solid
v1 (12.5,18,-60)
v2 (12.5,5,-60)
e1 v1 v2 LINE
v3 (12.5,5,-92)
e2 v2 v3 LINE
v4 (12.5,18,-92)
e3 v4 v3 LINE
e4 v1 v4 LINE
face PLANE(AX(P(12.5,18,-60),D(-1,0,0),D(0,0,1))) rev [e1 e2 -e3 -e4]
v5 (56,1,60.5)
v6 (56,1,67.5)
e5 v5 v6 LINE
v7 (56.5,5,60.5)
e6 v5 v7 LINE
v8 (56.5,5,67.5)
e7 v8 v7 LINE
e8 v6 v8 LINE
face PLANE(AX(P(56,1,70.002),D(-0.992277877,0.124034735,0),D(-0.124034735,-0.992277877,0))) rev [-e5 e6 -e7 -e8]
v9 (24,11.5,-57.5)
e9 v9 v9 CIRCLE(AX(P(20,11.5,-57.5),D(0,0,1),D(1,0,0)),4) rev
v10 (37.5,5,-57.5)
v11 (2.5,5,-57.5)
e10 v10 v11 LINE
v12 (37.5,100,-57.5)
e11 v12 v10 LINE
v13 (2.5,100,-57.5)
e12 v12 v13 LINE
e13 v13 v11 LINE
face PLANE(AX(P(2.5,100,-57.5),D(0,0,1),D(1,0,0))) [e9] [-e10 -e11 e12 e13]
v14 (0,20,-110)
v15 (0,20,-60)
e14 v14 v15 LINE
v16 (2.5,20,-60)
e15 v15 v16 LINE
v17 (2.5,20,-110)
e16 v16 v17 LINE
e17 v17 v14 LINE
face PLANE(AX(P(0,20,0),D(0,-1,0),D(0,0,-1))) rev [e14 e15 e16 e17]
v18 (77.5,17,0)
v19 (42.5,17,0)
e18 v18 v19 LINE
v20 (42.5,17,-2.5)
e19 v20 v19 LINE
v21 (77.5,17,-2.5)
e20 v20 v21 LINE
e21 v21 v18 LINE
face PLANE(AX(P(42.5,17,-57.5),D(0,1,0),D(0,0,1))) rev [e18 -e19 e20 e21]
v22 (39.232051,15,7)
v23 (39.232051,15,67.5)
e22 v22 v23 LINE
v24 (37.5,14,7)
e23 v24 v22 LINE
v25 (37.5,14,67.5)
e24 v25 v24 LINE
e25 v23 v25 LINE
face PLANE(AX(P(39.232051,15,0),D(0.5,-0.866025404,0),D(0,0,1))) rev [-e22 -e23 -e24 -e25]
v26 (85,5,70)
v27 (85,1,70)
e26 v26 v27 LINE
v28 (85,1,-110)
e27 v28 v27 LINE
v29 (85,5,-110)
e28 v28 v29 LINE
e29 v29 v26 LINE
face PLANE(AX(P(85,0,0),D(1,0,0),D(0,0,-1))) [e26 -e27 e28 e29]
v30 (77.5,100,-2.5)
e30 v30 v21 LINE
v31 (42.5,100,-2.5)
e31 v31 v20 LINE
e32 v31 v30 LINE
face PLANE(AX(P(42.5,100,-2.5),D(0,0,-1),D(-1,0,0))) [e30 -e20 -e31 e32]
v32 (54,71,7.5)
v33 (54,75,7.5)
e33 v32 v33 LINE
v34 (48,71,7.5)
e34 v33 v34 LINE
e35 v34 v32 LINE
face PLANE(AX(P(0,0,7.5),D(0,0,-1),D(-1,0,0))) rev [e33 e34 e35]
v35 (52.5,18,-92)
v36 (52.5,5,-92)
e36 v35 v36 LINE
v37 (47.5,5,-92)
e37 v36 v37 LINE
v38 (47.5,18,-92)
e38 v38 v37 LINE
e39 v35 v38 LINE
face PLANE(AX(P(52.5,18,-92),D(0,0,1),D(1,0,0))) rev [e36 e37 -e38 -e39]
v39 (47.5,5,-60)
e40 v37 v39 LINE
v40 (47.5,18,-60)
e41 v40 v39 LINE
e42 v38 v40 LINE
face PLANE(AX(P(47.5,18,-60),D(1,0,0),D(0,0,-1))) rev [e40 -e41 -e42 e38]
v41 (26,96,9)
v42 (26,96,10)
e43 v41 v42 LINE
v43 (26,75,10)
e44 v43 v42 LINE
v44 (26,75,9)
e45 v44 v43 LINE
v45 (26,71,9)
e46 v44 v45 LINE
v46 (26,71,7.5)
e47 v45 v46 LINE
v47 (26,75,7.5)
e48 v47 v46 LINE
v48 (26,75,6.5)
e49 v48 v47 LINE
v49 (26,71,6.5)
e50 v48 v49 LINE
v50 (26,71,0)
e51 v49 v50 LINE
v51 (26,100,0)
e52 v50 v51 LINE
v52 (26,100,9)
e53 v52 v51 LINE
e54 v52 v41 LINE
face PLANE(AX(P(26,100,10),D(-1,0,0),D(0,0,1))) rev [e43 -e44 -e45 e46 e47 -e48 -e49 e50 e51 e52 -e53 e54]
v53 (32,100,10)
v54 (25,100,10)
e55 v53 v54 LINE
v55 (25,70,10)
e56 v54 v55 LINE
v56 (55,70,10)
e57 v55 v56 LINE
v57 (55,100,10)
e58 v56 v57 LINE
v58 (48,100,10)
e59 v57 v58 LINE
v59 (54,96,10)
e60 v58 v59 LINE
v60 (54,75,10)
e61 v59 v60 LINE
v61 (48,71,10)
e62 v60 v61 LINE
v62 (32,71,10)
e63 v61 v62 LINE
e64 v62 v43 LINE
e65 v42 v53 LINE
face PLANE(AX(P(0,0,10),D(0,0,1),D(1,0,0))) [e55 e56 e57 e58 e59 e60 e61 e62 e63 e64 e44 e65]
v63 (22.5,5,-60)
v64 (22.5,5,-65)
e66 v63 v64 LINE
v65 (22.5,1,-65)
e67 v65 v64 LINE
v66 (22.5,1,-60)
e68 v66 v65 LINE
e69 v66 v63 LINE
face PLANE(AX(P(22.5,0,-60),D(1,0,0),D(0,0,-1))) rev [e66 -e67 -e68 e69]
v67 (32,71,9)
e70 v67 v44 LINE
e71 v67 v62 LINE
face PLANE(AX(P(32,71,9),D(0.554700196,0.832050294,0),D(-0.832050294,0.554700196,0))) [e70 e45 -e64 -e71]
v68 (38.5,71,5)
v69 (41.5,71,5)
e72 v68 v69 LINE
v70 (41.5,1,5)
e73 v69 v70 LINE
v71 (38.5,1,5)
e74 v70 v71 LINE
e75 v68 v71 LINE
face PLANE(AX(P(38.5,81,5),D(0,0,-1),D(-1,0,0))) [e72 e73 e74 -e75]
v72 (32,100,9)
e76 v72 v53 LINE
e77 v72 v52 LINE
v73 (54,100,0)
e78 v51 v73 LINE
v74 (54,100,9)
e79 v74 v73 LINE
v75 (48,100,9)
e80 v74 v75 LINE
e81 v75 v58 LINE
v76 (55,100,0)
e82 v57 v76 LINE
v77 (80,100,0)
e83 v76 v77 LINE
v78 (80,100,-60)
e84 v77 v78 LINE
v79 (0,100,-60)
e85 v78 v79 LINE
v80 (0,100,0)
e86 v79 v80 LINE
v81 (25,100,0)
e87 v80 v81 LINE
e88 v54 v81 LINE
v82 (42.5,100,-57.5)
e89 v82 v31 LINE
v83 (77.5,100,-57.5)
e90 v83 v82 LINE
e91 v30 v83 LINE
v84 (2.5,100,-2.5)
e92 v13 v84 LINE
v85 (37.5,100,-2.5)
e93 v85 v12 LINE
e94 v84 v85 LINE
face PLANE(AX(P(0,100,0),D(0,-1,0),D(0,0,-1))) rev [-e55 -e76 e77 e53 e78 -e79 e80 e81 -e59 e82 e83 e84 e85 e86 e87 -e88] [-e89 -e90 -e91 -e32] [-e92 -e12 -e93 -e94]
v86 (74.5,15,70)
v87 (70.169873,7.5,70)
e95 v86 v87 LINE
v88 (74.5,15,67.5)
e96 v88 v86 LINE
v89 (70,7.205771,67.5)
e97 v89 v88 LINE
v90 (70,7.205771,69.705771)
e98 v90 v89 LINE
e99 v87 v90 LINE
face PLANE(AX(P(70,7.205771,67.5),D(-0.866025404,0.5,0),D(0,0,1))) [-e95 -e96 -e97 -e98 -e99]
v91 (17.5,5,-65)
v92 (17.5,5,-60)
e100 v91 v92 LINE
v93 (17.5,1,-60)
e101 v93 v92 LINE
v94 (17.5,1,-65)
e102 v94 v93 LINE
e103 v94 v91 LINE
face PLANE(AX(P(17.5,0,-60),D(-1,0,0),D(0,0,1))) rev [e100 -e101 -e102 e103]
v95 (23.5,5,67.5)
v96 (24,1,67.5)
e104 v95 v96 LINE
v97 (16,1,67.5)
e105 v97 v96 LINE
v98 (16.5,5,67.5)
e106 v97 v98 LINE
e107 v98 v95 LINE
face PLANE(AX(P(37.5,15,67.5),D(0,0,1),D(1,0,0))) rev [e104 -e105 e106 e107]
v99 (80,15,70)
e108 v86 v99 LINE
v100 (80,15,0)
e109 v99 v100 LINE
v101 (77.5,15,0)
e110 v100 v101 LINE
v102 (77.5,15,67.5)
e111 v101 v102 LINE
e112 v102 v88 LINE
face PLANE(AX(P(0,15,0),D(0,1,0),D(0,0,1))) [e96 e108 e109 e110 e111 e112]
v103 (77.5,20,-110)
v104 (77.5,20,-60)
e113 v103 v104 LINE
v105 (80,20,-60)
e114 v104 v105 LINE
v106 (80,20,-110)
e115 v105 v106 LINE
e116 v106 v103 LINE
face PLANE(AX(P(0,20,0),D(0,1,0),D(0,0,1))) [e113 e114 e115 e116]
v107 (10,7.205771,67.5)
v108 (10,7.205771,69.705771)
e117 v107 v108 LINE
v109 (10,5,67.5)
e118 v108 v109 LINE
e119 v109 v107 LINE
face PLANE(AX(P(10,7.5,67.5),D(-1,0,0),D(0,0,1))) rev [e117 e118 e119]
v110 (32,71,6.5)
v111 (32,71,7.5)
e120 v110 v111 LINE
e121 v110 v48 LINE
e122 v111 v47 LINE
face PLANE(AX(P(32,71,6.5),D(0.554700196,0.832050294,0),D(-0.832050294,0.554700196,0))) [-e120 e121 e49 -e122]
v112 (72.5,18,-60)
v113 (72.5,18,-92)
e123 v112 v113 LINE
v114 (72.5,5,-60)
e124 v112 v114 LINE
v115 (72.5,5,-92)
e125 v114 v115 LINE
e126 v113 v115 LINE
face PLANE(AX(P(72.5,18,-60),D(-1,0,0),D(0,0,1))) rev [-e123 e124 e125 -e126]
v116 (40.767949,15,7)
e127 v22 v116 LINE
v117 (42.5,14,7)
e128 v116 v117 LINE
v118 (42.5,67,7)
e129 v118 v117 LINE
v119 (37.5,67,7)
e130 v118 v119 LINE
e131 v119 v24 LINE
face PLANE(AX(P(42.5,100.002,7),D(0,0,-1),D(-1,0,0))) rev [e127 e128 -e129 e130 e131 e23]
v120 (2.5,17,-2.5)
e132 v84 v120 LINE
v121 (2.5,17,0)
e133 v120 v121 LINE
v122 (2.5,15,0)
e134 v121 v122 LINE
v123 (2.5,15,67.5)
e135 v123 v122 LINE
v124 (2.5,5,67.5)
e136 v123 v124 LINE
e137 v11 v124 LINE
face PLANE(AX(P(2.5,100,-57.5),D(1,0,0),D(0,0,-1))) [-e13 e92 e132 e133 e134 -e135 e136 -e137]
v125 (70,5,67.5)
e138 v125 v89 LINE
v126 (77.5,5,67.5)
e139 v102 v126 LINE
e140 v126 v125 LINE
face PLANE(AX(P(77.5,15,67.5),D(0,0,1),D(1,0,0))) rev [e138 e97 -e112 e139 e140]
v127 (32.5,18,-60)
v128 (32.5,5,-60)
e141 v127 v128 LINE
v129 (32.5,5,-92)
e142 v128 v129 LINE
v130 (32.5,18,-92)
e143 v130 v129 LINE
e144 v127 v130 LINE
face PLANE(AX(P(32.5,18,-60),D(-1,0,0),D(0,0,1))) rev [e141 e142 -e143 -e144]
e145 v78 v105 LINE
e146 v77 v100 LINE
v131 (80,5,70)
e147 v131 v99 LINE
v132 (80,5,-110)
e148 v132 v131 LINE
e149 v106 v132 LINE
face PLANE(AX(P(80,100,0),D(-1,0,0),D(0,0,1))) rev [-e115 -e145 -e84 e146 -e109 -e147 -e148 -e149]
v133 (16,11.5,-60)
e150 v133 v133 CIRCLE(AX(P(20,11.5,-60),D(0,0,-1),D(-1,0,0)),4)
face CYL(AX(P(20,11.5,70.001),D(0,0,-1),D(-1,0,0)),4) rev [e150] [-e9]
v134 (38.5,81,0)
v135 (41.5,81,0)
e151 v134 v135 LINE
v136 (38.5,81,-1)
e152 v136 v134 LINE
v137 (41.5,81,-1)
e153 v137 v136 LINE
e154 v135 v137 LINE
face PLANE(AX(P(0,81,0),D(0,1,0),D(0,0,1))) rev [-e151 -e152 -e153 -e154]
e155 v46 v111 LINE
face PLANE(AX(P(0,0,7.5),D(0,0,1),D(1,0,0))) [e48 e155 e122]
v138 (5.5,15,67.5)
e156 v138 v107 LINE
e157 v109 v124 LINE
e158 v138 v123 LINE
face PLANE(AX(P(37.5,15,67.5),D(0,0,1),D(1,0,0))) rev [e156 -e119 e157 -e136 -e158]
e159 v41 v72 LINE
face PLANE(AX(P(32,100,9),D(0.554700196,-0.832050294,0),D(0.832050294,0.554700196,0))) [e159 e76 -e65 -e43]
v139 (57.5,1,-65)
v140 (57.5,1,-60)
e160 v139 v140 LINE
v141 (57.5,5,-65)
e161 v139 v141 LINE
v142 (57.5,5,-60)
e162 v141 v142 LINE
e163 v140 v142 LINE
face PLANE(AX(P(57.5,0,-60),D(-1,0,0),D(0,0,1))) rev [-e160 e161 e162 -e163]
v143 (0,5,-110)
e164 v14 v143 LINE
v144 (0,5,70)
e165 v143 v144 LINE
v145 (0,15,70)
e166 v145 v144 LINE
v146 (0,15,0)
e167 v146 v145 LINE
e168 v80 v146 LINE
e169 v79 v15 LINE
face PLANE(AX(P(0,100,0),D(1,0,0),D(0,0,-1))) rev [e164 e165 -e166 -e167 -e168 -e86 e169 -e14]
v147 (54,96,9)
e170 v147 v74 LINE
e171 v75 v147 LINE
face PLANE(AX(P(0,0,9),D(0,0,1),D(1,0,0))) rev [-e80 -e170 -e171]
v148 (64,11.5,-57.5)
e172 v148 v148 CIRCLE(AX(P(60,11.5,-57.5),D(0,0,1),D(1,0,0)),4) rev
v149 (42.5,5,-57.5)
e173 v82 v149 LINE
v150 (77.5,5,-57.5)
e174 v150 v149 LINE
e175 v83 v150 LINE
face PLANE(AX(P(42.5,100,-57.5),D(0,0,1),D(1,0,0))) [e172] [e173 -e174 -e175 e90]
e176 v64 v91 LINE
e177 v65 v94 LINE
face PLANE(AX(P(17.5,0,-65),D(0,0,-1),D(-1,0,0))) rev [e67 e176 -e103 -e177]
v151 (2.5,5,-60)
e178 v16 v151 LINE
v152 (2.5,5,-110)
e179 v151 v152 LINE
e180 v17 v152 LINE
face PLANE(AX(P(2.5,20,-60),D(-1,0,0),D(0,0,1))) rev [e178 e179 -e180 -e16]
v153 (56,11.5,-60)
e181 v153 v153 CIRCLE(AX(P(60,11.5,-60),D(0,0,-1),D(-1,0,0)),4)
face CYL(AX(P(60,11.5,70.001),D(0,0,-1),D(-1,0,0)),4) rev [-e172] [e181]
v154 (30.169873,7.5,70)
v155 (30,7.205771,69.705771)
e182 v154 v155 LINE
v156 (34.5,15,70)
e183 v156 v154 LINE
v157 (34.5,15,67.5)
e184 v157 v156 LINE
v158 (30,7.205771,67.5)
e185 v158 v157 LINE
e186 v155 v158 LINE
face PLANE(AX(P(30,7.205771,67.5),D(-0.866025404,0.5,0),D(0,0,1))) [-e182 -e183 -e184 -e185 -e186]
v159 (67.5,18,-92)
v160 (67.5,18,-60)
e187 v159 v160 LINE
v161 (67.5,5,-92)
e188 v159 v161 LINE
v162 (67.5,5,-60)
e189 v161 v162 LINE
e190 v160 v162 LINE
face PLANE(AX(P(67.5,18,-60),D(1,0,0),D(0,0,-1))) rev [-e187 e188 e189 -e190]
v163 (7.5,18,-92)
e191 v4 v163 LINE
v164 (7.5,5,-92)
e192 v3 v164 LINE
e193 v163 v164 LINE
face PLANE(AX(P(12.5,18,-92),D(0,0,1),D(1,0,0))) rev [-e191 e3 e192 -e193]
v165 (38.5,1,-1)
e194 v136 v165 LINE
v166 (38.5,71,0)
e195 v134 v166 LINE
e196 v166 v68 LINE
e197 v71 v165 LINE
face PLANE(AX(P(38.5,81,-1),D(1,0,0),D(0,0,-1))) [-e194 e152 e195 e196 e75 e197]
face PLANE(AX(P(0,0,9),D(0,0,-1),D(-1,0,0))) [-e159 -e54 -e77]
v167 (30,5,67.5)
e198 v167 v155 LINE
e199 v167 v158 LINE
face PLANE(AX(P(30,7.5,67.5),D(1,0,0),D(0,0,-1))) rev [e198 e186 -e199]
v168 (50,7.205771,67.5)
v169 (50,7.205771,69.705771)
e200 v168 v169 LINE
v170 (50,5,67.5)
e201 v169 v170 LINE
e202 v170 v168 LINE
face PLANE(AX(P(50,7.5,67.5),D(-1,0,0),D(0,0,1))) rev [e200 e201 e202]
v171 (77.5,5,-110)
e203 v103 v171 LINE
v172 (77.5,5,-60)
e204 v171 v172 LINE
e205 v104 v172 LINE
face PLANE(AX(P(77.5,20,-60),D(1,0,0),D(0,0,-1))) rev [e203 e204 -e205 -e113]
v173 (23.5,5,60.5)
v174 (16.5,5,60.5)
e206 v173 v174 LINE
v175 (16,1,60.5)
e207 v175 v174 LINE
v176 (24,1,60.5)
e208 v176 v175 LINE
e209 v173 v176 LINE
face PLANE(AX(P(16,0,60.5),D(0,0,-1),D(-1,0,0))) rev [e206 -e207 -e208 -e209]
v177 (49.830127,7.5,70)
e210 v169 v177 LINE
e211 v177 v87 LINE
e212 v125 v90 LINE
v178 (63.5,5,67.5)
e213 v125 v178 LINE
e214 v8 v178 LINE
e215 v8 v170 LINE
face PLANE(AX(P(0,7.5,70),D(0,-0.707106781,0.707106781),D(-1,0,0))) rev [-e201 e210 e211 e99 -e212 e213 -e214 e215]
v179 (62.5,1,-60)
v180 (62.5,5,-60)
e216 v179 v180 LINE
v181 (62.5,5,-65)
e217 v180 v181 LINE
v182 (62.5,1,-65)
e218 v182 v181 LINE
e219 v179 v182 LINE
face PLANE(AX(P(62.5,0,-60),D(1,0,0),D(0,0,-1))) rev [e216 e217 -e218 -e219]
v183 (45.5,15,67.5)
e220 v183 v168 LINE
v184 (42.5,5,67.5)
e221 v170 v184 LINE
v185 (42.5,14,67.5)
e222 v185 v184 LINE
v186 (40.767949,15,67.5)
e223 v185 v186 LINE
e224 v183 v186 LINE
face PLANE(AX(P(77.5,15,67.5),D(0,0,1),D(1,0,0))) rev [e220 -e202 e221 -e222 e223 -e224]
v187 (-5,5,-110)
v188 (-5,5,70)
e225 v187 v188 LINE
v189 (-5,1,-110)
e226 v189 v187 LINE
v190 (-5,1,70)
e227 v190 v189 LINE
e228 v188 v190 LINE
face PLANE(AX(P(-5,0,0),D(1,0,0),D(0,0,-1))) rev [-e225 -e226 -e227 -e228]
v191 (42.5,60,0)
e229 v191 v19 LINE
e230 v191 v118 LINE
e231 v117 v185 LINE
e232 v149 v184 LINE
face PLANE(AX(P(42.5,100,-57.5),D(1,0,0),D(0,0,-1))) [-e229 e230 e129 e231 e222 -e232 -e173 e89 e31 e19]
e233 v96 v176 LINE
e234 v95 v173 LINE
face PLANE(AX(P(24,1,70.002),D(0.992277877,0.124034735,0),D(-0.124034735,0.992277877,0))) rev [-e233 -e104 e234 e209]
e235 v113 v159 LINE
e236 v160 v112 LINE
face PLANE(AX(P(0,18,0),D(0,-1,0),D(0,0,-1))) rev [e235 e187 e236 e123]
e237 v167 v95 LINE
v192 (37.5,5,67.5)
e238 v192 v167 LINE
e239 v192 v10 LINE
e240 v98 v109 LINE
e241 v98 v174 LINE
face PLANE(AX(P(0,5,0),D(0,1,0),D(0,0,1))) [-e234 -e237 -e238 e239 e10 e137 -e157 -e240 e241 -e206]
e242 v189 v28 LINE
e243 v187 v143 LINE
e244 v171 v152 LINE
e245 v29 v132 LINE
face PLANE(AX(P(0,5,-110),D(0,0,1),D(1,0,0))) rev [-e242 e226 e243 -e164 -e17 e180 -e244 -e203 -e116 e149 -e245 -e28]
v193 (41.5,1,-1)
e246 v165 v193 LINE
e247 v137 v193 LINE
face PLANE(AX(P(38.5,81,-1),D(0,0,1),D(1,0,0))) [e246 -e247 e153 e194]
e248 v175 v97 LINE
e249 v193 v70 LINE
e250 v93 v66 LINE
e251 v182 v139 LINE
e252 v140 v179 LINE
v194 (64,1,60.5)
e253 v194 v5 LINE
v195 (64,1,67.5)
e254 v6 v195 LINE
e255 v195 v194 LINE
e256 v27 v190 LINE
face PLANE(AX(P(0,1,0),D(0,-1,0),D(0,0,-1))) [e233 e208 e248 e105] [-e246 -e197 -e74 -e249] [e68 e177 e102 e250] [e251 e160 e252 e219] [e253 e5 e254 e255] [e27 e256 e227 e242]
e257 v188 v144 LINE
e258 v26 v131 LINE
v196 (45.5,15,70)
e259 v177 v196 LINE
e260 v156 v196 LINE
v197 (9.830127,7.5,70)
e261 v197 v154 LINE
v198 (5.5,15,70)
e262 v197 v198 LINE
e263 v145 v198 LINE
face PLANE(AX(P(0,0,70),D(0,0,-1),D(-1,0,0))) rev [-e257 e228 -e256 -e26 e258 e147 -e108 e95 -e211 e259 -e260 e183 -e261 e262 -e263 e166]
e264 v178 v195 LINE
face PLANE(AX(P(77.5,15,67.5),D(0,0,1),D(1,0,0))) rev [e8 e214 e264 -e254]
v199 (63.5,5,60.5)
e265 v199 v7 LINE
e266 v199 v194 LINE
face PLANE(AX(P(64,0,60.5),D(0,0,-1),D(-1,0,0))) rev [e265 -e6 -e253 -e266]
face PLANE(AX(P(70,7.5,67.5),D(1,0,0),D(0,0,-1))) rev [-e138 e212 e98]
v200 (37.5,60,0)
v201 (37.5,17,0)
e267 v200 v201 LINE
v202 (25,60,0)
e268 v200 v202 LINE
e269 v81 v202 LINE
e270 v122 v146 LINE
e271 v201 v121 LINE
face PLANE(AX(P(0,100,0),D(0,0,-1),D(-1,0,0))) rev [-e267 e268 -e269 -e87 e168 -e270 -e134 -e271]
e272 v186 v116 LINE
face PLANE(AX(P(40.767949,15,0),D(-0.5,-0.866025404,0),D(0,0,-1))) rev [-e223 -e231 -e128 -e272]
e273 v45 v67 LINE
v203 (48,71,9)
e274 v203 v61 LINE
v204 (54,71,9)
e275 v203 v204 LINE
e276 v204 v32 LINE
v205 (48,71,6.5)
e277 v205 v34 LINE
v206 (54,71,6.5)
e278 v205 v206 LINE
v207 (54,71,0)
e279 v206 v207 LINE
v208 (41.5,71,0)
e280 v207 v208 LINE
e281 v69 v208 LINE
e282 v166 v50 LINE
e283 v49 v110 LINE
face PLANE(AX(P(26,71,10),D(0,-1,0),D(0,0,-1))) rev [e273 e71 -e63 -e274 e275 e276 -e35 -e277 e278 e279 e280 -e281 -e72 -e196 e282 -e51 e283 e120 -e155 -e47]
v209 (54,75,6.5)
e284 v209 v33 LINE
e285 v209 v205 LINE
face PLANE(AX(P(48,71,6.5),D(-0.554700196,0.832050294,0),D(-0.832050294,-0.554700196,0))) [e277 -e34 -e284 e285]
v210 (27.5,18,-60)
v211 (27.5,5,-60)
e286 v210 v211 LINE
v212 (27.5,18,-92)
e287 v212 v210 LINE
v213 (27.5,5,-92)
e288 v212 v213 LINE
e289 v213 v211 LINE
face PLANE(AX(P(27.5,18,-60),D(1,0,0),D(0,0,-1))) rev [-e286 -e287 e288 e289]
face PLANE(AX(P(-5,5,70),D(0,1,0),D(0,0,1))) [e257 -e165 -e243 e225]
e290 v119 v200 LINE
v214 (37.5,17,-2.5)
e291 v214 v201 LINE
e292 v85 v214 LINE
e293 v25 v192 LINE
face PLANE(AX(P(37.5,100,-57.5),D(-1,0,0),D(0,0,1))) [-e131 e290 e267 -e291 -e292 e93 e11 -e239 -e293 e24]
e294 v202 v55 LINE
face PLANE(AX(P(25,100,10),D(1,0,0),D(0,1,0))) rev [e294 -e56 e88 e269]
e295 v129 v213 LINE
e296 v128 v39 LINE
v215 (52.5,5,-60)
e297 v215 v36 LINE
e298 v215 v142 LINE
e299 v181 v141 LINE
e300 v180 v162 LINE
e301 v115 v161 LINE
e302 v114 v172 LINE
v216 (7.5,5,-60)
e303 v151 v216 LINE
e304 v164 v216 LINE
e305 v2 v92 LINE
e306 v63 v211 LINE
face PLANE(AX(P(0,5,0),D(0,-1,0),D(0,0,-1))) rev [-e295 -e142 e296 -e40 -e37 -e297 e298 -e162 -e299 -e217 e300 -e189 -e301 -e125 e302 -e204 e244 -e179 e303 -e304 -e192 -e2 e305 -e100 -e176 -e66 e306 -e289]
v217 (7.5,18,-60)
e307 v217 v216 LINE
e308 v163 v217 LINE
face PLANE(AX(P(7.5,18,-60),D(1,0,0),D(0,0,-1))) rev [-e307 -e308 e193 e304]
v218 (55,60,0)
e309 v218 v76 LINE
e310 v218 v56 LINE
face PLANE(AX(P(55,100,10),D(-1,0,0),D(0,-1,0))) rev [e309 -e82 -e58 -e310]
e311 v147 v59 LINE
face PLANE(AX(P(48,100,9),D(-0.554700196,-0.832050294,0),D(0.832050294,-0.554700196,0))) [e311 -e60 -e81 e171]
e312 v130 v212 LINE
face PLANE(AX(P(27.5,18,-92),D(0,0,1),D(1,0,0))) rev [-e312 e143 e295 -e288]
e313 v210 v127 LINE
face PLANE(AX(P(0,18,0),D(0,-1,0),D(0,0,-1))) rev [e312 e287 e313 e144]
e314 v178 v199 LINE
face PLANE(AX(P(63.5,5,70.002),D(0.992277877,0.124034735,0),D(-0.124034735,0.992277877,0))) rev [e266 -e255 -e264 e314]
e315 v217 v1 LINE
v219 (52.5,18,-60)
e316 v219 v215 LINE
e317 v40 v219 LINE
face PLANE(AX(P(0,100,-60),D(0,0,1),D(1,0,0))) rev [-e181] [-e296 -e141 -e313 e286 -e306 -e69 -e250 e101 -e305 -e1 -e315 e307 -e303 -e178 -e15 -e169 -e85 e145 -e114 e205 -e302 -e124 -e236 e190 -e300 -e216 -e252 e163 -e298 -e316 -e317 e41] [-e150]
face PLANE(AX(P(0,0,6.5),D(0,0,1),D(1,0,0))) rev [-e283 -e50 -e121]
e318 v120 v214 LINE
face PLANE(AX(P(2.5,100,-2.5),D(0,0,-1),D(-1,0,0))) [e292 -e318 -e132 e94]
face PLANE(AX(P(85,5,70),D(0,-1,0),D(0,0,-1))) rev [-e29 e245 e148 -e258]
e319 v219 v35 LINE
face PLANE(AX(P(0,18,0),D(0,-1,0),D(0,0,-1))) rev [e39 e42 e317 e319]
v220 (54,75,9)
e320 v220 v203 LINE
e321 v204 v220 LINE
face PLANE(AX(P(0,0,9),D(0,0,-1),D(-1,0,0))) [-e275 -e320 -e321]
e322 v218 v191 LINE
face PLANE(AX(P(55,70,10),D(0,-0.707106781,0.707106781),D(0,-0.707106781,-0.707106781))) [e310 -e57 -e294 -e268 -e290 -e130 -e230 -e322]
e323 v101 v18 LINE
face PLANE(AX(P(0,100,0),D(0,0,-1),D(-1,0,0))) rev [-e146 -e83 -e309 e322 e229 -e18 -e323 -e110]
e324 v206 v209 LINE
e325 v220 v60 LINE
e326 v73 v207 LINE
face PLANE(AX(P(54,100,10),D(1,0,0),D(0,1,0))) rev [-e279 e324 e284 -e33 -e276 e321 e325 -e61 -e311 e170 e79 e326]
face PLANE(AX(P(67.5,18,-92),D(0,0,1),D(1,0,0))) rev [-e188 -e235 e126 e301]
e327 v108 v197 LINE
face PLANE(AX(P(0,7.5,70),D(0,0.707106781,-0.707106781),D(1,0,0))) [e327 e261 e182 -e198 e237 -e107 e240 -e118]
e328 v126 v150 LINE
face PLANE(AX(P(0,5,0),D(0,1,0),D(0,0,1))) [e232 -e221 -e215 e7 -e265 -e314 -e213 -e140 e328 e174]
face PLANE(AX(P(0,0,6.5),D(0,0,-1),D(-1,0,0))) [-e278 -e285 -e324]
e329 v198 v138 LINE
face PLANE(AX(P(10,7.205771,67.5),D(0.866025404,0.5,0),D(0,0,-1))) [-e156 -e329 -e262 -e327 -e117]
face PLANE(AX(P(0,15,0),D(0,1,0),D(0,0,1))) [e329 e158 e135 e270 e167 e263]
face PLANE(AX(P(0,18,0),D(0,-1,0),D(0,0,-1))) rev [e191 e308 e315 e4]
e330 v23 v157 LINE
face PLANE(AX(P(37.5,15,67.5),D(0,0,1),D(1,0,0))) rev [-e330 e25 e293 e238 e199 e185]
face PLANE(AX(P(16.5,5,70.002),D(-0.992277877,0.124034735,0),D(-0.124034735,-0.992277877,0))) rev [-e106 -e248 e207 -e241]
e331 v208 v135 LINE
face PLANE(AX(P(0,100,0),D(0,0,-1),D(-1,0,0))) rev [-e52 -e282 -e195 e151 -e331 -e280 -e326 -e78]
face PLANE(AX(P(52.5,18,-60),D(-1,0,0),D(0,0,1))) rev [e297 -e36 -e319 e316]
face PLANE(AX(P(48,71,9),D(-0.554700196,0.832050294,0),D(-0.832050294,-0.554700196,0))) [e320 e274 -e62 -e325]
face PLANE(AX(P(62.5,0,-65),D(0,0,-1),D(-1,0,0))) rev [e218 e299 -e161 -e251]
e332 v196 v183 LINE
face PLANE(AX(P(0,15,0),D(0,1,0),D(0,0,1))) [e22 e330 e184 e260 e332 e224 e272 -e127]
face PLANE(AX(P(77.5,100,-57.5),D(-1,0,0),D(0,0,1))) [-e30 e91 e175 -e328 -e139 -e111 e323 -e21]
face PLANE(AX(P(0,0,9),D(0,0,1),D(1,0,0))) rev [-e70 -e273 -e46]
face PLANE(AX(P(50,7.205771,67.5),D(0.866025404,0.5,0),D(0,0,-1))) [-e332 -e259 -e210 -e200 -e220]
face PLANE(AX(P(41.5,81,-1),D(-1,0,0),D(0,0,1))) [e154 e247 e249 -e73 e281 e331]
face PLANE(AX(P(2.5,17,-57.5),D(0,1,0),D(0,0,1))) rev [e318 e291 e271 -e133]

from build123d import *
from OCP.BRepFilletAPI import BRepFilletAPI_MakeChamfer

# Parameters (mm, degrees)
SKETCH1_W                                   = 80
SKETCH1_H                                   = 60
BOSS_EXTRUDE1_DEPTH                         = 100
CUT_EXTRUDE1_START                          = 5
SKETCH2_W                                   = 35
SKETCH2_H                                   = 55
CUT_EXTRUDE1_DEPTH                          = 95
SKETCH3_W                                   = 80
SKETCH3_H                                   = 5
BOSS_EXTRUDE2_DEPTH                         = 70
BOSS_EXTRUDE3_DEPTH                         = 10
SKETCH5_W                                   = 20
SKETCH5_H                                   = 2.5
CUT_EXTRUDE2_DEPTH                          = 7.5
SKETCH6_W                                   = 35
SKETCH6_H                                   = 12
CUT_EXTRUDE4_DEPTH                          = 57.5
CUT_EXTRUDE6_REACH                          = 184.483
SKETCH7_R                                   = 4
SKETCH9_W                                   = 80
SKETCH9_H                                   = 50
BOSS_EXTRUDE4_DEPTH                         = 5
SKETCH13_W                                  = 8
SKETCH13_H                                  = 7
CUT_EXTRUDE8_BUTTON_HOLES_DEPTH             = 166.90660023
BOSS_EXTRUDE5_OLED_MOUNT_DEPTH              = 10
BOSS_EXTRUDE6_OLED_MOUNT_DEPTH              = 1
BOSS_EXTRUDE7_START                         = -2.5
BOSS_EXTRUDE7_OLED_MOUNT_DEPTH              = 1
BOSS_EXTRUDE8_OLED_MOUNT_DEPTH              = 1
BOSS_EXTRUDE13_OLED_MOUNT_SUPPORT_DEPTH     = 30
CUT_EXTRUDE9_OLED_CABLE_DEPTH               = 10
CUT_EXTRUDE9_OLED_CABLE_DEPTH_BACK          = 154.430766146
SKETCH18_W                                  = 3
SKETCH18_H                                  = 6
BOSS_EXTRUDE12_OLED_CABLE_GUIDE_REACH       = 162.39
SKETCH20_W                                  = 5
SKETCH20_H                                  = 5
CUT_EXTRUDE10_SOLENOID_WIRE_HOLE_DEPTH      = 166.90660023
SKETCH21_W                                  = 5
SKETCH21_H                                  = 32
BOSS_EXTRUDE9_SOLENOID_SIDE_SUPPORT_DEPTH   = 13
SKETCH27_W                                  = 2.5
SKETCH27_H                                  = 50
BOSS_EXTRUDE13_SOLENOID_SECTION_WALLS_DEPTH = 15
SKETCH29_W                                  = 180
SKETCH29_H                                  = 5
BOSS_EXTRUDE9_GUIDE_DEPTH                   = 5
BOSS_EXTRUDE10_START                        = -80
SKETCH29_3_W                                = 180
SKETCH29_3_H                                = 5
BOSS_EXTRUDE10_GUIDE_DEPTH                  = 5
SKETCH33_W                                  = 90
SKETCH33_H                                  = 180
CUT_EXTRUDE7_SLIM_BASE_DEPTH                = 1
BOSS_EXTRUDE5_REACH                         = 217.163
CHAMFER3_THUMB_SIZE                         = 2.5
CHAMFER5_THUMB_SIZE                         = 4.5
CHAMFER5_THUMB_SIZE2                        = 7.794228634
CHAMFER5_THUMB_PART_2_SIZE                  = 4.5
CHAMFER5_THUMB_PART_2_SIZE2                 = 7.794228634
CHAMFER5_THUMB_PART_3_SIZE                  = 4.5
CHAMFER5_THUMB_PART_3_SIZE2                 = 7.794228634
CHAMFER6_SIZE                               = 1
CHAMFER6_SIZE2                              = 1.732050808


with BuildPart() as part:
    # Sketch1 → Boss-Extrude1 (new body)
    with BuildSketch(Plane(origin=(0, 0, 0), x_dir=(1, 0, 0), z_dir=(0, 1, 0))):
        with Locations((40, 30)):
            Rectangle(SKETCH1_W, SKETCH1_H)
    extrude(amount=BOSS_EXTRUDE1_DEPTH)

    # Sketch2 → Cut-Extrude1 (cut)
    with BuildSketch(Plane(origin=(0, 0, 0), x_dir=(1, 0, 0), z_dir=(0, 1, 0)).offset(CUT_EXTRUDE1_START)):
        with Locations((20, 30)):
            Rectangle(SKETCH2_W, SKETCH2_H)
        with Locations((60, 30)):
            Rectangle(SKETCH2_W, SKETCH2_H)
    extrude(amount=CUT_EXTRUDE1_DEPTH, mode=Mode.SUBTRACT)

    # Sketch3 → Boss-Extrude2 (add)
    with BuildSketch(Plane.XY):
        with Locations((40, 2.5)):
            Rectangle(SKETCH3_W, SKETCH3_H)
    extrude(amount=BOSS_EXTRUDE2_DEPTH)

    # Sketch4 → Boss-Extrude3 (add)
    with BuildSketch(Plane(origin=(0, 5, 0), x_dir=(1, 0, 0), z_dir=(0, 1, 0))):
        Polygon((80, 0), (77.5, 0), (77.5, -67.5), (42.5, -67.5), (42.5, 0), (37.5, 0), (37.5, -67.5), (2.5, -67.5), (2.5, 0), (0, 0), (0, -70), (80, -70), align=None)
    extrude(amount=BOSS_EXTRUDE3_DEPTH)

    # Sketch5 → Cut-Extrude2 (cut)
    with BuildSketch(Plane(origin=(0, 15, 0), x_dir=(1, 0, 0), z_dir=(0, 1, 0))):
        with Locations((20, -68.75)):
            Rectangle(SKETCH5_W, SKETCH5_H)
        with Locations((60, -68.75)):
            Rectangle(SKETCH5_W, SKETCH5_H)
    extrude(amount=-CUT_EXTRUDE2_DEPTH, mode=Mode.SUBTRACT)

    # Sketch6 → Cut-Extrude4 (cut)
    with BuildSketch(Plane.XY):
        with Locations((20, 11)):
            Rectangle(SKETCH6_W, SKETCH6_H)
        with Locations((60, 11)):
            Rectangle(SKETCH6_W, SKETCH6_H)
    extrude(amount=-CUT_EXTRUDE4_DEPTH, mode=Mode.SUBTRACT)

    # Sketch7 → Cut-Extrude6 (cut, up to next)
    with BuildSketch(Plane(origin=(0, 0, -60), x_dir=(-1, 0, 0), z_dir=(0, 0, -1)), mode=Mode.PRIVATE) as cut_extrude6_sk1:
        with Locations((-20, 11.5)):
            Circle(SKETCH7_R)
    cut_extrude6_tool1 = extrude(cut_extrude6_sk1.sketch, amount=-CUT_EXTRUDE6_REACH, mode=Mode.PRIVATE) & part.part
    # Sketch7 → Cut-Extrude6 (cut, up to next)
    with BuildSketch(Plane(origin=(0, 0, -60), x_dir=(-1, 0, 0), z_dir=(0, 0, -1)), mode=Mode.PRIVATE) as cut_extrude6_sk2:
        with Locations((-60, 11.5)):
            Circle(SKETCH7_R)
    cut_extrude6_tool2 = extrude(cut_extrude6_sk2.sketch, amount=-CUT_EXTRUDE6_REACH, mode=Mode.PRIVATE) & part.part
    add(cut_extrude6_tool1.solids().sort_by_distance((20, 11.5, -60))[0], mode=Mode.SUBTRACT)
    add(cut_extrude6_tool2.solids().sort_by_distance((60, 11.5, -60))[0], mode=Mode.SUBTRACT)

    # Sketch9 → Boss-Extrude4 (add)
    with BuildSketch(Plane(origin=(0, 0, 0), x_dir=(1, 0, 0), z_dir=(0, 1, 0))):
        with Locations((40, 85)):
            Rectangle(SKETCH9_W, SKETCH9_H)
    extrude(amount=BOSS_EXTRUDE4_DEPTH)

    # Sketch13 → Cut-Extrude8 _Button Holes (cut, through all)
    with BuildSketch(Plane(origin=(0, 5, 0), x_dir=(1, 0, 0), z_dir=(0, 1, 0))):
        with Locations((20, -64)):
            Rectangle(SKETCH13_W, SKETCH13_H)
        with Locations((60, -64)):
            Rectangle(SKETCH13_W, SKETCH13_H)
    extrude(amount=-CUT_EXTRUDE8_BUTTON_HOLES_DEPTH, mode=Mode.SUBTRACT)

    # Sketch14 → Boss-Extrude5 _OLED Mount (add)
    with BuildSketch(Plane.XY):
        Polygon((25, 100), (26, 100), (26, 71), (54, 71), (54, 100), (55, 100), (55, 70), (54, 70), (26, 70), (25, 70), align=None)
    extrude(amount=BOSS_EXTRUDE5_OLED_MOUNT_DEPTH)

    # Sketch15 → Boss-Extrude6 _OLED Mount (add)
    with BuildSketch(Plane.XY.offset(10)):
        Polygon((26, 71), (32, 71), (26, 75), align=None)
        Polygon((54, 75), (54, 71), (48, 71), align=None)
    extrude(amount=-BOSS_EXTRUDE6_OLED_MOUNT_DEPTH)

    # Sketch15_2 → Boss-Extrude7 _OLED Mount (add)
    with BuildSketch(Plane.XY.offset(10).offset(BOSS_EXTRUDE7_START)):
        Polygon((26, 71), (32, 71), (26, 75), align=None)
        Polygon((54, 75), (54, 71), (48, 71), align=None)
    extrude(amount=-BOSS_EXTRUDE7_OLED_MOUNT_DEPTH)

    # Sketch17 → Boss-Extrude8 _OLED Mount (add)
    with BuildSketch(Plane.XY.offset(10)):
        Polygon((54, 96), (54, 100), (48, 100), align=None)
        Polygon((26, 100), (32, 100), (26, 96), align=None)
    extrude(amount=-BOSS_EXTRUDE8_OLED_MOUNT_DEPTH)

    # Sketch32 → Boss-Extrude13 OLED Mount Support (add)
    with BuildSketch(Plane.ZY.offset(-25)):
        Polygon((0, 70), (10, 70), (0, 60), align=None)
    extrude(amount=-BOSS_EXTRUDE13_OLED_MOUNT_SUPPORT_DEPTH)

    # Sketch18 → Cut-Extrude9 _OLED Cable (cut, two sides: drawn at the far end of the back side and taken through both)
    with BuildSketch(Plane(origin=(0, 71, 0), x_dir=(1, 0, 0), z_dir=(0, 1, 0)).offset(-CUT_EXTRUDE9_OLED_CABLE_DEPTH_BACK)):
        with Locations((40, -2)):
            Rectangle(SKETCH18_W, SKETCH18_H)
    extrude(amount=CUT_EXTRUDE9_OLED_CABLE_DEPTH + CUT_EXTRUDE9_OLED_CABLE_DEPTH_BACK, mode=Mode.SUBTRACT)

    # Boss-Extrude12 _OLED Cable Guide: up to this plane
    boss_extrude12_oled_cable_guide_end = Plane(origin=(55, 70, 10), z_dir=(0, -0.7071067811865477, 0.7071067811865474))
    # Sketch31 → Boss-Extrude12 _OLED Cable Guide (add, up to the surface)
    with BuildSketch(Plane(origin=(0, 15, 0), x_dir=(1, 0, 0), z_dir=(0, 1, 0)), mode=Mode.PRIVATE) as boss_extrude12_oled_cable_guide_sk1:
        Polygon((37.5, 0), (38.5, 0), (38.5, -5), (41.5, -5), (41.5, 0), (42.5, 0), (42.5, -7), (37.5, -7), align=None)
    boss_extrude12_oled_cable_guide_tool1 = split(extrude(boss_extrude12_oled_cable_guide_sk1.sketch, amount=BOSS_EXTRUDE12_OLED_CABLE_GUIDE_REACH, mode=Mode.PRIVATE), bisect_by=boss_extrude12_oled_cable_guide_end, keep=Keep.BOTH, mode=Mode.PRIVATE)
    add(boss_extrude12_oled_cable_guide_tool1.solids().sort_by_distance((38, 15, 0.086023))[0])

    # Sketch20 → Cut-Extrude10 _Solenoid Wire Hole (cut, through all)
    with BuildSketch(Plane(origin=(0, 5, 0), x_dir=(1, 0, 0), z_dir=(0, 1, 0))):
        with Locations((60, 62.5)):
            Rectangle(SKETCH20_W, SKETCH20_H)
        with Locations((20, 62.5)):
            Rectangle(SKETCH20_W, SKETCH20_H)
    extrude(amount=-CUT_EXTRUDE10_SOLENOID_WIRE_HOLE_DEPTH, mode=Mode.SUBTRACT)

    # Sketch21 → Boss-Extrude9 _Solenoid Side Support (add)
    with BuildSketch(Plane(origin=(0, 5, 0), x_dir=(1, 0, 0), z_dir=(0, 1, 0))):
        with Locations((70, 76)):
            Rectangle(SKETCH21_W, SKETCH21_H)
        with Locations((50, 76)):
            Rectangle(SKETCH21_W, SKETCH21_H)
        with Locations((30, 76)):
            Rectangle(SKETCH21_W, SKETCH21_H)
        with Locations((10, 76)):
            Rectangle(SKETCH21_W, SKETCH21_H)
    extrude(amount=BOSS_EXTRUDE9_SOLENOID_SIDE_SUPPORT_DEPTH)

    # Sketch27 → Boss-Extrude13 _Solenoid Section Walls (add)
    with BuildSketch(Plane(origin=(0, 5, 0), x_dir=(1, 0, 0), z_dir=(0, 1, 0))):
        with Locations((78.75, 85)):
            Rectangle(SKETCH27_W, SKETCH27_H)
        with Locations((1.25, 85)):
            Rectangle(SKETCH27_W, SKETCH27_H)
    extrude(amount=BOSS_EXTRUDE13_SOLENOID_SECTION_WALLS_DEPTH)

    # Sketch29 → Boss-Extrude9 _Guide (add)
    with BuildSketch(Plane(origin=(80, 0, 0), x_dir=(0, 0, -1), z_dir=(1, 0, 0))):
        with Locations((20, 2.5)):
            Rectangle(SKETCH29_W, SKETCH29_H)
    extrude(amount=BOSS_EXTRUDE9_GUIDE_DEPTH)

    # Sketch29_3 → Boss-Extrude10 _Guide (add)
    with BuildSketch(Plane(origin=(80, 0, 0), x_dir=(0, 0, -1), z_dir=(1, 0, 0)).offset(BOSS_EXTRUDE10_START)):
        with Locations((20, 2.5)):
            Rectangle(SKETCH29_3_W, SKETCH29_3_H)
    extrude(amount=-BOSS_EXTRUDE10_GUIDE_DEPTH)

    # Sketch33 → Cut-Extrude7 _Slim Base (cut)
    with BuildSketch(Plane.XZ):
        with Locations((40, -20)):
            Rectangle(SKETCH33_W, SKETCH33_H)
    extrude(amount=-CUT_EXTRUDE7_SLIM_BASE_DEPTH, mode=Mode.SUBTRACT)

    # Sketch34 → Boss-Extrude5 (add, up to next)
    with BuildSketch(Plane.XY.offset(60.5), mode=Mode.PRIVATE) as boss_extrude5_sk1:
        Polygon((16, 5), (16.5, 5), (16, 1), align=None)
    boss_extrude5_tool1 = extrude(boss_extrude5_sk1.sketch, amount=BOSS_EXTRUDE5_REACH, mode=Mode.PRIVATE) - part.part
    # Sketch34 → Boss-Extrude5 (add, up to next)
    with BuildSketch(Plane.XY.offset(60.5), mode=Mode.PRIVATE) as boss_extrude5_sk2:
        Polygon((24, 5), (24, 1), (23.5, 5), align=None)
    boss_extrude5_tool2 = extrude(boss_extrude5_sk2.sketch, amount=BOSS_EXTRUDE5_REACH, mode=Mode.PRIVATE) - part.part
    # Sketch34 → Boss-Extrude5 (add, up to next)
    with BuildSketch(Plane.XY.offset(60.5), mode=Mode.PRIVATE) as boss_extrude5_sk3:
        Polygon((56.5, 5), (56, 5), (56, 1), align=None)
    boss_extrude5_tool3 = extrude(boss_extrude5_sk3.sketch, amount=BOSS_EXTRUDE5_REACH, mode=Mode.PRIVATE) - part.part
    # Sketch34 → Boss-Extrude5 (add, up to next)
    with BuildSketch(Plane.XY.offset(60.5), mode=Mode.PRIVATE) as boss_extrude5_sk4:
        Polygon((64, 1), (64, 5), (63.5, 5), align=None)
    boss_extrude5_tool4 = extrude(boss_extrude5_sk4.sketch, amount=BOSS_EXTRUDE5_REACH, mode=Mode.PRIVATE) - part.part
    add(boss_extrude5_tool1.solids().sort_by_distance((16.166667, 3.666667, 60.5))[0])
    add(boss_extrude5_tool2.solids().sort_by_distance((23.833333, 3.666667, 60.5))[0])
    add(boss_extrude5_tool3.solids().sort_by_distance((56.166667, 3.666667, 60.5))[0])
    add(boss_extrude5_tool4.solids().sort_by_distance((63.833333, 3.666667, 60.5))[0])

    # Chamfer3 _Thumb
    chamfer3_thumb_edges = [part.edges().sort_by_distance(p)[0] for p in [
        (20, 7.5, 67.5),
        (60, 7.5, 67.5),
    ]]
    chamfer(chamfer3_thumb_edges, length=CHAMFER3_THUMB_SIZE - 0.0001)  # a hair under: the kernel refuses the full size

    # Chamfer5 _Thumb
    chamfer5_thumb_edges = [part.edges().sort_by_distance(p)[0] for p in [
        (70, 15, 68.75),
    ]]
    chamfer5_thumb_side = [part.faces().sort_by_distance(p)[0] for p in [
        (78.266129032, 15, 38.266129032),
    ]]
    chamfer(chamfer5_thumb_edges, length=CHAMFER5_THUMB_SIZE, length2=CHAMFER5_THUMB_SIZE2, reference=chamfer5_thumb_side[0])

    # Chamfer5 _Thumb part 2
    chamfer5_thumb_part_2_edges = [part.edges().sort_by_distance(p)[0] for p in [
        (50, 15, 68.75),
        (30, 15, 68.75),
    ]]
    chamfer5_thumb_part_2_side = [part.faces().sort_by_distance(p)[0] for p in [
        (40, 15, 41.718085106),
    ]]
    chamfer(chamfer5_thumb_part_2_edges, length=CHAMFER5_THUMB_PART_2_SIZE, length2=CHAMFER5_THUMB_PART_2_SIZE2, reference=chamfer5_thumb_part_2_side[0])

    # Chamfer5 _Thumb part 3
    chamfer5_thumb_part_3_edges = [part.edges().sort_by_distance(p)[0] for p in [
        (10, 15, 68.75),
    ]]
    chamfer5_thumb_part_3_side = [part.faces().sort_by_distance(p)[0] for p in [
        (1.733870968, 15, 38.266129032),
    ]]
    chamfer(chamfer5_thumb_part_3_edges, length=CHAMFER5_THUMB_PART_3_SIZE, length2=CHAMFER5_THUMB_PART_3_SIZE2, reference=chamfer5_thumb_part_3_side[0])

    # Chamfer6: one chamfer whose edges measure the first distance from different faces: ONE call of the kernel's chamfer builder (chamfer() names one face for all edges)
    chamfer6_edges_1 = [part.edges().sort_by_distance(p)[0] for p in [
        (37.5, 15, 37.25),
    ]]
    chamfer6_side_1 = [part.faces().sort_by_distance(p)[0] for p in [
        (37.5, 47.010473988, -21.180224367),
    ]]
    chamfer6_edges_2 = [part.edges().sort_by_distance(p)[0] for p in [
        (42.5, 15, 37.25),
    ]]
    chamfer6_side_2 = [part.faces().sort_by_distance(p)[0] for p in [
        (42.5, 47.010473988, -21.180224367),
    ]]
    chamfer6 = BRepFilletAPI_MakeChamfer(part.part.solid().wrapped)
    for e in chamfer6_edges_1:
        chamfer6.Add(CHAMFER6_SIZE, CHAMFER6_SIZE2, e.wrapped, chamfer6_side_1[0].wrapped)  # the first distance lies on this face
    for e in chamfer6_edges_2:
        chamfer6.Add(CHAMFER6_SIZE, CHAMFER6_SIZE2, e.wrapped, chamfer6_side_2[0].wrapped)  # the first distance lies on this face
    add(Compound.cast(chamfer6.Shape()), mode=Mode.REPLACE)


solid = part.part
